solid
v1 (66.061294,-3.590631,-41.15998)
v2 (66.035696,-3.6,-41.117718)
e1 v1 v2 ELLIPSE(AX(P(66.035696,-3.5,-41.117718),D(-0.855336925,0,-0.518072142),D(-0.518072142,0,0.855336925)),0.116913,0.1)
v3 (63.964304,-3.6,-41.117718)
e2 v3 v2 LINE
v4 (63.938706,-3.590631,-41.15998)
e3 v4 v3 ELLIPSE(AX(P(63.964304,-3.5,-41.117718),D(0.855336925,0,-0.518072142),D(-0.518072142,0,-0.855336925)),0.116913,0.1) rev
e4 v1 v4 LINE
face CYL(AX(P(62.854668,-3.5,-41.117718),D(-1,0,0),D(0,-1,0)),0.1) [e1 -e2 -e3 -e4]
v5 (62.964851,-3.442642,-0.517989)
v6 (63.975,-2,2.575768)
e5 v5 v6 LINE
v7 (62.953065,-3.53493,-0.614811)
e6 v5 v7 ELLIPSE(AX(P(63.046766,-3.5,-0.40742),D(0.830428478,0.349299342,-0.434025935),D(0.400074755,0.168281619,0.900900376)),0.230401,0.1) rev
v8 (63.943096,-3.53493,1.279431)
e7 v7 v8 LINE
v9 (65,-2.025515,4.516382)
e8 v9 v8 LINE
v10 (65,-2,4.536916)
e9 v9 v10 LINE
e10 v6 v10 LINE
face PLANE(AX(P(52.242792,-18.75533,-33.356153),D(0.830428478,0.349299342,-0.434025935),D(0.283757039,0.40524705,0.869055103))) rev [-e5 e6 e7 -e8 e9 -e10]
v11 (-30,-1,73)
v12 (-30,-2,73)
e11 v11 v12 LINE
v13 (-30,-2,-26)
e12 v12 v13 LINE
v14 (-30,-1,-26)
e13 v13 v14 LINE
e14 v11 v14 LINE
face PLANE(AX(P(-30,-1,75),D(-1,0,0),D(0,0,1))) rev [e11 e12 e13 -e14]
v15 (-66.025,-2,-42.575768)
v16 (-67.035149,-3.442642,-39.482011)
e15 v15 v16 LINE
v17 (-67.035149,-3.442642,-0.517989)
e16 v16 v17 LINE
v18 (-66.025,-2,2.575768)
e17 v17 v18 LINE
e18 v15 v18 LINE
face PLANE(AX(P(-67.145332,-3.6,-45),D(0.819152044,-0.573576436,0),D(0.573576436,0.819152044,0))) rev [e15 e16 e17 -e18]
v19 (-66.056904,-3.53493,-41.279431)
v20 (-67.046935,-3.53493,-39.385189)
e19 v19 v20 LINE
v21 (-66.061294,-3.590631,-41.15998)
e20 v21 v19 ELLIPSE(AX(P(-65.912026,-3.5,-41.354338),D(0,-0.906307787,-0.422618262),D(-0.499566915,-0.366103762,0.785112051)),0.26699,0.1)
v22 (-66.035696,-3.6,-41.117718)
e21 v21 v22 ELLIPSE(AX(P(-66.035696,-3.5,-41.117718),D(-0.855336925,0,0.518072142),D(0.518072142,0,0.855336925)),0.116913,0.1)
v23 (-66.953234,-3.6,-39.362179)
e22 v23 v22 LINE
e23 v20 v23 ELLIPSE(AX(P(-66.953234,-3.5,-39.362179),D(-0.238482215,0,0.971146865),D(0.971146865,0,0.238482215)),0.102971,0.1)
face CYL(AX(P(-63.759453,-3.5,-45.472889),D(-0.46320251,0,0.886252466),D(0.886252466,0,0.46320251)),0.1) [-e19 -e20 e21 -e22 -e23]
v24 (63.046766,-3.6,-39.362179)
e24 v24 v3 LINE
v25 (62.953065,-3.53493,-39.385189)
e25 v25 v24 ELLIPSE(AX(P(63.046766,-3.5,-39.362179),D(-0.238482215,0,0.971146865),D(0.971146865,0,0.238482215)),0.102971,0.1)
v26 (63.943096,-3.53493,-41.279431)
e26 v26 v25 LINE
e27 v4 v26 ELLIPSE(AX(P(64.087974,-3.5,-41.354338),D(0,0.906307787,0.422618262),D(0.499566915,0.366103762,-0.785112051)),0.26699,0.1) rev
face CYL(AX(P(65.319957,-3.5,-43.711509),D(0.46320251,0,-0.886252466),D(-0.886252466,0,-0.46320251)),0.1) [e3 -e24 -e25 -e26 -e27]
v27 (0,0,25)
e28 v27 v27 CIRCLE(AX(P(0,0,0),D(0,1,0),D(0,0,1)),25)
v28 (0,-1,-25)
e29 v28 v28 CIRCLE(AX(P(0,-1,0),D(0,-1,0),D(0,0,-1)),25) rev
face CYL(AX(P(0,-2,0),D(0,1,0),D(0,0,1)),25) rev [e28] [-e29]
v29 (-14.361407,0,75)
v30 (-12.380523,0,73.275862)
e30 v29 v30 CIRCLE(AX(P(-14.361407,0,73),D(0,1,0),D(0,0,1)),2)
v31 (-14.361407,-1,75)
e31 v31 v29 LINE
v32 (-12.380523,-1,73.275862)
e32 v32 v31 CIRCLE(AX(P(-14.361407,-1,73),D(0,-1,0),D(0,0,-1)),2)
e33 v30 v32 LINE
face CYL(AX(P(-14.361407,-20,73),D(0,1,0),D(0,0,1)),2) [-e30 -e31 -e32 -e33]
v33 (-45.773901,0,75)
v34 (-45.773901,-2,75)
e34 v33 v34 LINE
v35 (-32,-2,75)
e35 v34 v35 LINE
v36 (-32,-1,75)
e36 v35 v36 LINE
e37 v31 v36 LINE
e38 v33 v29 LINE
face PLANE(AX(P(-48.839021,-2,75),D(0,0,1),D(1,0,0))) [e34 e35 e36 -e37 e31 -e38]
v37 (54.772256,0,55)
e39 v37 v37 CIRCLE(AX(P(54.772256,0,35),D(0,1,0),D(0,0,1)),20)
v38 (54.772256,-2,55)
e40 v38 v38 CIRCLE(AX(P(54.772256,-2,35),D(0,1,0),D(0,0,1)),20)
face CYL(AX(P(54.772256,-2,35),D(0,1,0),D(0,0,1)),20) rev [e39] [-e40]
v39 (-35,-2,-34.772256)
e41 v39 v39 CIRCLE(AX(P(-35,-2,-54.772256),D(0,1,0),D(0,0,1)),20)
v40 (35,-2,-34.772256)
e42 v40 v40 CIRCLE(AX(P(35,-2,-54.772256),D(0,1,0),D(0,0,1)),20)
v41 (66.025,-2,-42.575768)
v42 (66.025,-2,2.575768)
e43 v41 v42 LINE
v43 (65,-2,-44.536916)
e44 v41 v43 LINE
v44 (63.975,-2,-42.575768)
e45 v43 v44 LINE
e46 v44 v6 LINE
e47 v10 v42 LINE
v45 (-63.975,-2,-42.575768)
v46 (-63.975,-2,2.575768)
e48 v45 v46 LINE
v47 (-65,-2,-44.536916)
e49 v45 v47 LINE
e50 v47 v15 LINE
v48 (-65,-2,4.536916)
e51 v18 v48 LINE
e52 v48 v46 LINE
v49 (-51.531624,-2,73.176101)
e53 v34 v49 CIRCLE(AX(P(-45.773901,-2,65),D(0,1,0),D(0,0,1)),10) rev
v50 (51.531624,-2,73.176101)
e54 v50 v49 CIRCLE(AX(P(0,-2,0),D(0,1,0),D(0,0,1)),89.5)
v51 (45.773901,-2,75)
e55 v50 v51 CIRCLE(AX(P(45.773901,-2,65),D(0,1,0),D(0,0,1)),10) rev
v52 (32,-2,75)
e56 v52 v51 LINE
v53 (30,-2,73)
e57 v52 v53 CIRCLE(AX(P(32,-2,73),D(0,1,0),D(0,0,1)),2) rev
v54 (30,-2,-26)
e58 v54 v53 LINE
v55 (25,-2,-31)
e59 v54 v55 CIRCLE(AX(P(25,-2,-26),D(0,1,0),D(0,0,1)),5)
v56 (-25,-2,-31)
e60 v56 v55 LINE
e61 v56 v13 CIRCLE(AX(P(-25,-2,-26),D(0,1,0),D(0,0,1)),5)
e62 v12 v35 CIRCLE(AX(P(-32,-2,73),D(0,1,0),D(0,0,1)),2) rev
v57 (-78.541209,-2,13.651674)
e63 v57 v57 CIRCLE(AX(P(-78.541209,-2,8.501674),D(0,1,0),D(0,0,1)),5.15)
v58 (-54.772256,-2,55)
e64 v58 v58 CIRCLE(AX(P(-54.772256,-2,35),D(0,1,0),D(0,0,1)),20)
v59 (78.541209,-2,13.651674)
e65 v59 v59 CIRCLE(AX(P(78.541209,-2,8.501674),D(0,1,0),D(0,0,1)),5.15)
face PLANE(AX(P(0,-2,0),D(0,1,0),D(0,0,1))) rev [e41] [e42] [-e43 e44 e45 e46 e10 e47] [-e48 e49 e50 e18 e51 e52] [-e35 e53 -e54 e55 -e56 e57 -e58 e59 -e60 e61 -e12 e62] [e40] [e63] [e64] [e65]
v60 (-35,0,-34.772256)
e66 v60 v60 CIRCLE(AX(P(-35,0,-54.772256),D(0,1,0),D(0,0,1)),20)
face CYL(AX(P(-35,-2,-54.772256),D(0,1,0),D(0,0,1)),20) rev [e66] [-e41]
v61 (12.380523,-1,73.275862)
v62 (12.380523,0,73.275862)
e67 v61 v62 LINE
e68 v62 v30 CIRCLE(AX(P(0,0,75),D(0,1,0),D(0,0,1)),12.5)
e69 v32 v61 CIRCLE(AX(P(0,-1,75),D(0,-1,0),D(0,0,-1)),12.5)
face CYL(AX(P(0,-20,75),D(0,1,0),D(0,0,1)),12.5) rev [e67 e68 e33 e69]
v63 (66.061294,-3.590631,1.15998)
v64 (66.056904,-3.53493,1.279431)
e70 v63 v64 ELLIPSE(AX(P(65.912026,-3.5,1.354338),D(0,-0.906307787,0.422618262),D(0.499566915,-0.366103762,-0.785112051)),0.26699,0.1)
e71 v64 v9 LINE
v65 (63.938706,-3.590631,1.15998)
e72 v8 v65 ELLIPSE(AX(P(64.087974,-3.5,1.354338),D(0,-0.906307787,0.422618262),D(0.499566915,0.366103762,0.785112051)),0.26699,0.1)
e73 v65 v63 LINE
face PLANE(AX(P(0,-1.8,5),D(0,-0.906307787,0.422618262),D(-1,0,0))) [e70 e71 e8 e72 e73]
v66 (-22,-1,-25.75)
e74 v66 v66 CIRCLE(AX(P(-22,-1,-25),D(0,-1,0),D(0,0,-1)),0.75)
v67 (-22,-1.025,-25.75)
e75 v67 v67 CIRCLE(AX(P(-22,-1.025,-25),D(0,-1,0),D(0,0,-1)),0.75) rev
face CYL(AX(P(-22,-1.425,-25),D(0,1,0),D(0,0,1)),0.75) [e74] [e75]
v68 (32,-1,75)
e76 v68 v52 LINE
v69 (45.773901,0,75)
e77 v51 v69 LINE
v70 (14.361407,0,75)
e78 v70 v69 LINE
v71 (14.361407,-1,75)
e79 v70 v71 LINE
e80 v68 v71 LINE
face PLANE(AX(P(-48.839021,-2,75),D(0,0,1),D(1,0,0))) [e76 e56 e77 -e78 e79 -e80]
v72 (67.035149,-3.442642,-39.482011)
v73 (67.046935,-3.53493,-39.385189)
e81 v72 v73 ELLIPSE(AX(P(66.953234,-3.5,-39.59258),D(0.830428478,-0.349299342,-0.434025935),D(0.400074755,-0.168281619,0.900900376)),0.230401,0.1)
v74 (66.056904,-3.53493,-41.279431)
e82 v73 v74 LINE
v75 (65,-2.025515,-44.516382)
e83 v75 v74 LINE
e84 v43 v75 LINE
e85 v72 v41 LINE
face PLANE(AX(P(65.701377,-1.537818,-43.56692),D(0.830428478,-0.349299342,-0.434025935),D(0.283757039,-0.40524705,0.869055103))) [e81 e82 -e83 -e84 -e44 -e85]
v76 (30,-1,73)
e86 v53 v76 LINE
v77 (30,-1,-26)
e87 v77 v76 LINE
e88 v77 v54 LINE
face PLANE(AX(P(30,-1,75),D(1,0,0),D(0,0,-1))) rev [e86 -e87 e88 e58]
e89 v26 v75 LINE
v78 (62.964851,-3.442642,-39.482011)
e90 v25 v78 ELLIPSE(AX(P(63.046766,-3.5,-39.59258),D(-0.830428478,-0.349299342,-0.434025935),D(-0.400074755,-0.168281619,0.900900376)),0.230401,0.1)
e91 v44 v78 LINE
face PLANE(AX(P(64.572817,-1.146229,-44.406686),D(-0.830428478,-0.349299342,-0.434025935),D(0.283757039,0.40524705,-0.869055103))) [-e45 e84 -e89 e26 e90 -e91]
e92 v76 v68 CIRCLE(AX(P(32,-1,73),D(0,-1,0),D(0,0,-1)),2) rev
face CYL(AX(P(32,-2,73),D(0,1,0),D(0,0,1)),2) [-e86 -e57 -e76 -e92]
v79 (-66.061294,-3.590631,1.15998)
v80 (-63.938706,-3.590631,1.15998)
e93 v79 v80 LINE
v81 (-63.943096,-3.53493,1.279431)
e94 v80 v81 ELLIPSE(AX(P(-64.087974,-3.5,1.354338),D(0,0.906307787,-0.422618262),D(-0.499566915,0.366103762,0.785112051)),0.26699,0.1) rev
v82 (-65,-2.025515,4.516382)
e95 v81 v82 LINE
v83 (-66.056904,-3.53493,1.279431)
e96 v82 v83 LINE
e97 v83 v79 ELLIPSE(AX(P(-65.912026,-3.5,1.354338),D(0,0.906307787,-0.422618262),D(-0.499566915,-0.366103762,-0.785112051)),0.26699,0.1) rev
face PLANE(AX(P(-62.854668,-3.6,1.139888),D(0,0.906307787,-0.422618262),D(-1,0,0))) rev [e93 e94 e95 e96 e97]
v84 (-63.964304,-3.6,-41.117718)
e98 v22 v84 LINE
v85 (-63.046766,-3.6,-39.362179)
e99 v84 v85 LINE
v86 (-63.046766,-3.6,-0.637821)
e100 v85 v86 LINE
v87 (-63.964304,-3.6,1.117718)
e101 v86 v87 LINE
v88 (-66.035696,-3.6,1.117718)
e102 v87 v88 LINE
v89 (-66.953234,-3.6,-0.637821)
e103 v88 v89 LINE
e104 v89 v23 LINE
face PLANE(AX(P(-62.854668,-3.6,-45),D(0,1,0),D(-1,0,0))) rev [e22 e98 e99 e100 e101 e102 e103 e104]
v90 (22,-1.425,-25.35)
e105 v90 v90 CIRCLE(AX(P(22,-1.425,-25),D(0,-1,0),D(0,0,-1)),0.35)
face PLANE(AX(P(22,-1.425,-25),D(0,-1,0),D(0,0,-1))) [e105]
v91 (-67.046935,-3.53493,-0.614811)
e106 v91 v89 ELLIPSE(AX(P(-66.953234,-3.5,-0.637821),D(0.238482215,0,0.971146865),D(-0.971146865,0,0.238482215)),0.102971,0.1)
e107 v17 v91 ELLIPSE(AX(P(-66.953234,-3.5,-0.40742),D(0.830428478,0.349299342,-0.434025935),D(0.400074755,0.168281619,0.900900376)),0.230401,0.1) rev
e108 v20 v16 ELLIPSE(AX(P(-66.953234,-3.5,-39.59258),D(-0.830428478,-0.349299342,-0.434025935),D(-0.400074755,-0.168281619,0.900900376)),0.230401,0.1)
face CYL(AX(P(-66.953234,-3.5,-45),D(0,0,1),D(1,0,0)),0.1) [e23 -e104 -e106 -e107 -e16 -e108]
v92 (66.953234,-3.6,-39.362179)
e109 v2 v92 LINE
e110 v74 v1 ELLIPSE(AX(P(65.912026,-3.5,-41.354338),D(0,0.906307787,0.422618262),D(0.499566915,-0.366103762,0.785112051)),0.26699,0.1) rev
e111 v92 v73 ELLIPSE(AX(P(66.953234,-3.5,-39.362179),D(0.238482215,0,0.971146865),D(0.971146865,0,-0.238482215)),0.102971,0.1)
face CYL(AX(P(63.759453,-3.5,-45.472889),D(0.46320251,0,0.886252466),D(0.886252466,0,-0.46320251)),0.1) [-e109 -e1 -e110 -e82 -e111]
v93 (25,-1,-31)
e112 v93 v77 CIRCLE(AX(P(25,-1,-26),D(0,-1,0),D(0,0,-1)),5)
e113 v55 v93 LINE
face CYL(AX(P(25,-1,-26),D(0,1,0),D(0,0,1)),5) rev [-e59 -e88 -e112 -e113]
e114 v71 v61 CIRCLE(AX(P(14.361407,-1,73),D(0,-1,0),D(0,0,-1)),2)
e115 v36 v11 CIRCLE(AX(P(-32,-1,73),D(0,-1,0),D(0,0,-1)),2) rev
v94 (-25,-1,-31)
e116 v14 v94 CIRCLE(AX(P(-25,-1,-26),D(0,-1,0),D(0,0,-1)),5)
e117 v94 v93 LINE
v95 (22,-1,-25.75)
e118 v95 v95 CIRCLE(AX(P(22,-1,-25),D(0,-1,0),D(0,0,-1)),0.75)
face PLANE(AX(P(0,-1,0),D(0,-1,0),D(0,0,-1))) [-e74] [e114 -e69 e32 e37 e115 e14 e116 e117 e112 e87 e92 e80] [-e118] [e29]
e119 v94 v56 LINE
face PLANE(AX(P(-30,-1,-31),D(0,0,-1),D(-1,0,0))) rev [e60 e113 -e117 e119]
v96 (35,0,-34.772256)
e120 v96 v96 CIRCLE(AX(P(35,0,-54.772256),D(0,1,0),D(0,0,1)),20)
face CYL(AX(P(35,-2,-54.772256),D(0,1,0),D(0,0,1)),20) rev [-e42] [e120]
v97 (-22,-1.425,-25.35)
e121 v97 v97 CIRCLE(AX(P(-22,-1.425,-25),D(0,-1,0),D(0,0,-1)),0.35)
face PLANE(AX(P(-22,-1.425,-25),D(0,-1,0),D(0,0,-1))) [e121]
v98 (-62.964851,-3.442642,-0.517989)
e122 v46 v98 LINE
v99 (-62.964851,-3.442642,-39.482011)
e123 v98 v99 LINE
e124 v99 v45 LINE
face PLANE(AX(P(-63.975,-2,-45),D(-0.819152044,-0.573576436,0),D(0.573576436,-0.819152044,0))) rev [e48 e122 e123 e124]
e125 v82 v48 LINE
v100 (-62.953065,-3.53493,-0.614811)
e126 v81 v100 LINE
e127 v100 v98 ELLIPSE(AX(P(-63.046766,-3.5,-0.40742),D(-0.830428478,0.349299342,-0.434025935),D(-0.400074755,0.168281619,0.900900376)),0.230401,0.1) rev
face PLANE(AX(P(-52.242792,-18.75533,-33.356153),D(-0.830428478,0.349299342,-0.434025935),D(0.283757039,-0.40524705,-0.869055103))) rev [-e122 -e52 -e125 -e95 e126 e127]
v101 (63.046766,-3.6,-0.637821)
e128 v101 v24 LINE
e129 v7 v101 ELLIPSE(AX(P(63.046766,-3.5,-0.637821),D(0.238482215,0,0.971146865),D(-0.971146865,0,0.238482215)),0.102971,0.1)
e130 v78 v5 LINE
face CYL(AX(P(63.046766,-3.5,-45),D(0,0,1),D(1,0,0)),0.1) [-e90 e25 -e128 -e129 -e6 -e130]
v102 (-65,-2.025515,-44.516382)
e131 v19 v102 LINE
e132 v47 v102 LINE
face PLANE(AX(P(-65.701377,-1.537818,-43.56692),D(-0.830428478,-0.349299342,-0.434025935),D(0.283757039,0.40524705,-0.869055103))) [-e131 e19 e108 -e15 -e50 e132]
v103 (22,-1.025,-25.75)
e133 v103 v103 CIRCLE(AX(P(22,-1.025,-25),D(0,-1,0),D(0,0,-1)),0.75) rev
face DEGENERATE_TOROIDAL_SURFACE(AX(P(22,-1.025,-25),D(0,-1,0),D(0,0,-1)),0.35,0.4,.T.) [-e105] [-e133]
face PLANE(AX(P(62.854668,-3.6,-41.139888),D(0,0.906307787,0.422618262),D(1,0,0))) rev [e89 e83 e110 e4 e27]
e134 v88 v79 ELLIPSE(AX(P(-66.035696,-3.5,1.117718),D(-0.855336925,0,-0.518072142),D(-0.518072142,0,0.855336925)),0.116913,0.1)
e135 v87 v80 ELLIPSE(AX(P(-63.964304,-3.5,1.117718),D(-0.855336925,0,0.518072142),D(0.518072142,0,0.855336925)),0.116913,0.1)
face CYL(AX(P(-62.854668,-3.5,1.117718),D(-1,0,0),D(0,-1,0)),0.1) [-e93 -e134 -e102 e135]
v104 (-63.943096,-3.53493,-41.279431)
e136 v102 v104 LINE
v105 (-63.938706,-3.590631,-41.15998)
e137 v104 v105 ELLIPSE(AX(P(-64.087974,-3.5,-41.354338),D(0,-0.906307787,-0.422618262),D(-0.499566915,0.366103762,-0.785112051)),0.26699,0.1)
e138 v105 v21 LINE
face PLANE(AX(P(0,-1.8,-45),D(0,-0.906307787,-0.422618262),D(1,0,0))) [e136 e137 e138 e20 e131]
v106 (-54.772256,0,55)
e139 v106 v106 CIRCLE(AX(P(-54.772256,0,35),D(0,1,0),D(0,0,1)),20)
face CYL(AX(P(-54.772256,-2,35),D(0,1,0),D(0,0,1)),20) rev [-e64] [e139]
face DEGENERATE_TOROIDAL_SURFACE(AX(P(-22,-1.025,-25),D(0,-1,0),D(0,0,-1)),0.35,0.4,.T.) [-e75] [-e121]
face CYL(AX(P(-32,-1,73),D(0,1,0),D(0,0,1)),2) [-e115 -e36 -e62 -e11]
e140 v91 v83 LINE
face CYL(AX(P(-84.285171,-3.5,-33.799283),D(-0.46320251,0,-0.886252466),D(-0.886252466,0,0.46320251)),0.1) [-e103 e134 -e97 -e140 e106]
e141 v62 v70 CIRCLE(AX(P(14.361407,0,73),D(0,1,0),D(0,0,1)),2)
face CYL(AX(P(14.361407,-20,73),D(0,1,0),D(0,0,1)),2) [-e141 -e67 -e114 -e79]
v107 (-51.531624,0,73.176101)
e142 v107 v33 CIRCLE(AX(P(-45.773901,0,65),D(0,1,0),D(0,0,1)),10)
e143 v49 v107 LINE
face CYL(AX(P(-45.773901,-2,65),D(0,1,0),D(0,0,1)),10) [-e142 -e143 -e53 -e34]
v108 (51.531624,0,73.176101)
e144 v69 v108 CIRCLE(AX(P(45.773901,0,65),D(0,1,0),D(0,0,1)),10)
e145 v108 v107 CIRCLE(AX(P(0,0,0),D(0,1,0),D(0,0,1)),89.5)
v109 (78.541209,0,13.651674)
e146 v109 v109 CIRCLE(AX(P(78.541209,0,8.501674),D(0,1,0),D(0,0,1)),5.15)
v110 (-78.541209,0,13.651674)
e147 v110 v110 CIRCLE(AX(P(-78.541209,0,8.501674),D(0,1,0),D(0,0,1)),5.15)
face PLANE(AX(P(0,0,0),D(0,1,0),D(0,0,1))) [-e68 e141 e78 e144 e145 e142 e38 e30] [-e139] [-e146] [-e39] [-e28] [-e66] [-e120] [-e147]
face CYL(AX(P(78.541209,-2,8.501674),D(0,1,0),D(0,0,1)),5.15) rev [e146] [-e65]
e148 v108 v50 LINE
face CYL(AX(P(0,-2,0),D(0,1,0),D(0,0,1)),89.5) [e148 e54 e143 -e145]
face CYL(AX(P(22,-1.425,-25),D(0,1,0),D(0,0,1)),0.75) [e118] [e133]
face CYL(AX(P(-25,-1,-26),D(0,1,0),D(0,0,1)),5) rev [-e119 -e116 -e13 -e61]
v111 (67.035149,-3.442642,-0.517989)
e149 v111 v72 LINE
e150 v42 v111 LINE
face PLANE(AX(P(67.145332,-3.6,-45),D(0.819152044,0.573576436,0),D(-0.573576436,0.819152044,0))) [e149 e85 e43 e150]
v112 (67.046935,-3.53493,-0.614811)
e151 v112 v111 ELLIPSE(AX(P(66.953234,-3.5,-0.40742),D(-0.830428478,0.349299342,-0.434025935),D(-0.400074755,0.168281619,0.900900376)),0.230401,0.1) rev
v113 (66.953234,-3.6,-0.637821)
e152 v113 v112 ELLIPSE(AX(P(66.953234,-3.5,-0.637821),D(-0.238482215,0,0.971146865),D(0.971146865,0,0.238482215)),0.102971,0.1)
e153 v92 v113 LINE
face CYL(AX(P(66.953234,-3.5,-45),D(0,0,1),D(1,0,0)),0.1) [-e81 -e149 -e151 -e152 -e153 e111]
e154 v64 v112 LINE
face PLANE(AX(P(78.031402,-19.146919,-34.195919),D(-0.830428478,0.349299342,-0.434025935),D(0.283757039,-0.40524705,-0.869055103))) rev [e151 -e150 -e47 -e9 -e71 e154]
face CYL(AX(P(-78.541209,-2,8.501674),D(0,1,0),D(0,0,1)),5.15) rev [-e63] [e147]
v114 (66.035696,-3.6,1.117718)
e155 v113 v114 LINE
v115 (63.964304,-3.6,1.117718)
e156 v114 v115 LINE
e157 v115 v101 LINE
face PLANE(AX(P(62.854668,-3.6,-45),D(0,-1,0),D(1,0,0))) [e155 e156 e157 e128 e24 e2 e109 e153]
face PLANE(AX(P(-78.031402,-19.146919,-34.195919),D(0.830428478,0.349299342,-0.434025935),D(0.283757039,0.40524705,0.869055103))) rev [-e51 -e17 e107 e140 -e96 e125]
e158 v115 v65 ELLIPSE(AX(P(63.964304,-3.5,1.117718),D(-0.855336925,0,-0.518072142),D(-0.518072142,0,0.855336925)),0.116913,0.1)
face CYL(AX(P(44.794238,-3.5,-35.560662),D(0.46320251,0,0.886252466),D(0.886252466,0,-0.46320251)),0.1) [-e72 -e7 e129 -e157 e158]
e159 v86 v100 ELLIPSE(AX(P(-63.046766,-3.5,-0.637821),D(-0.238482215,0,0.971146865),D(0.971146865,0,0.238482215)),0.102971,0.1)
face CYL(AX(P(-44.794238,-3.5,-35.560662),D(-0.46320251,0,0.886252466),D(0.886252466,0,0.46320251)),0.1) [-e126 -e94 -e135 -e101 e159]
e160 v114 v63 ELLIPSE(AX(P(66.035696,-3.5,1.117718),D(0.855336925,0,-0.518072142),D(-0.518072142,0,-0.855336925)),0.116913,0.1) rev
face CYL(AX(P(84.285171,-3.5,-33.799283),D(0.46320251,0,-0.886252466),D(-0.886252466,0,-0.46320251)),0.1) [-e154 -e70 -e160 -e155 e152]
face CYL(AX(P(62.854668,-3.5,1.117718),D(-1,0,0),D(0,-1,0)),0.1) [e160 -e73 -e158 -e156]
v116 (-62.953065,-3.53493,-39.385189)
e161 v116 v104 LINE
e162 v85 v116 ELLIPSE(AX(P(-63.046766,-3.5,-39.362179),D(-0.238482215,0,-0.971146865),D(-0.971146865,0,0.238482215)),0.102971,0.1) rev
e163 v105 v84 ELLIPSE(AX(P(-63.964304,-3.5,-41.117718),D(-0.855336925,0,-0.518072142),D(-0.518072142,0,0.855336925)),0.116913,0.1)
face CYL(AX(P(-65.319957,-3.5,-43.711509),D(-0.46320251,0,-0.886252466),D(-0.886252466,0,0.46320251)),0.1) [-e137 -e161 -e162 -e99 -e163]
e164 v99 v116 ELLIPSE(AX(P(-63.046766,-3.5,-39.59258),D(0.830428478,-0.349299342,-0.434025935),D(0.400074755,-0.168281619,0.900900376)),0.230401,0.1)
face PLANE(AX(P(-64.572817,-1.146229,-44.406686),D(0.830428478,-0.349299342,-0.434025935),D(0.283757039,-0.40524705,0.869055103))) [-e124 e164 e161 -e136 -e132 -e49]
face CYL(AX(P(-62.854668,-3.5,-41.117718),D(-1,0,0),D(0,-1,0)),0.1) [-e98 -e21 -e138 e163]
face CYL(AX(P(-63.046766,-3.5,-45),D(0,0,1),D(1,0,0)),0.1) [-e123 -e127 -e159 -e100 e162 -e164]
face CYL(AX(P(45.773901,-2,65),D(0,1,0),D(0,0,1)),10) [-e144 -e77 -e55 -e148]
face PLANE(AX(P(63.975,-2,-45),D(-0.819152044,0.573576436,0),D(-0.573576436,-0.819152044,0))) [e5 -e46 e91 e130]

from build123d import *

# Parameters (mm, degrees)
BOSS_EXTRUDE1_DEPTH = 2
SKETCH9_R           = 5.15
CUT_EXTRUDE3_DEPTH  = 127.587914115
VISION_PATTERN_R    = 25
VISION_PATTERN_R_2  = 20
CUT_EXTRUDE4_DEPTH  = 127.587914115
FILLET1_R           = 10
BOSS_EXTRUDE4_DEPTH = 50
SKETCH12_W          = 60
SKETCH12_H          = 106
CUT_EXTRUDE5_DEPTH  = 1
SKETCH16_R          = 12.5
CUT_EXTRUDE9_DEPTH  = 20
SKETCH17_R          = 0.75
BOSS_EXTRUDE3_DEPTH = 0.425
CHAMFER1_SIZE       = 1.8
CHAMFER1_SIZE_2     = 3.860112457
CHAMFER2_SIZE       = 0.987120775
CHAMFER2_SIZE_2     = 1
FILLET3_R           = 0.1
FILLET2_R           = 0.4
FILLET4_R           = 5
FILLET5_R           = 2


with BuildPart() as part:
    # Sketch1 → Boss-Extrude1 (new body)
    with BuildSketch(Plane(origin=(0, 0, 0), x_dir=(1, 0, 0), z_dir=(0, 1, 0))):
        with BuildLine():
            Line((-48.839021284, -75), (48.839021284, -75))
            ThreePointArc((48.839021284, -75), (0, 89.5), (-48.839021284, -75))
        make_face()
    extrude(amount=-BOSS_EXTRUDE1_DEPTH)

    # Sketch9 → Cut-Extrude3 (cut, through all)
    with BuildSketch(Plane(origin=(0, 0, 0), x_dir=(1, 0, 0), z_dir=(0, 1, 0))):
        with Locations(Location((78.541209232, -8.501673503, 0), (0, 0, 270))):
            Circle(SKETCH9_R)
        with Locations(Location((-78.541209232, -8.501673503, 0), (0, 0, 270))):
            Circle(SKETCH9_R)
    extrude(amount=-CUT_EXTRUDE3_DEPTH, mode=Mode.SUBTRACT)

    # Vision Pattern → Cut-Extrude4 (cut, through all)
    with BuildSketch(Plane(origin=(0, 0, 0), x_dir=(1, 0, 0), z_dir=(0, 1, 0))):
        with Locations(Location((0, 0, 0), (0, 0, 270))):
            Circle(VISION_PATTERN_R)
        with Locations(Location((54.772255751, -35, 0), (0, 0, 270))):
            Circle(VISION_PATTERN_R_2)
        with Locations(Location((-54.772255751, -35, 0), (0, 0, 270))):
            Circle(VISION_PATTERN_R_2)
        with Locations(Location((35, 54.772255751, 0), (0, 0, 270))):
            Circle(VISION_PATTERN_R_2)
        with Locations(Location((-35, 54.772255751, 0), (0, 0, 270))):
            Circle(VISION_PATTERN_R_2)
    extrude(amount=-CUT_EXTRUDE4_DEPTH, mode=Mode.SUBTRACT)

    # Fillet1
    fillet1_edges = [part.edges().sort_by_distance(p)[0] for p in [
        (48.839021284, -1, 75),
        (-48.839021284, -1, 75),
    ]]
    fillet(fillet1_edges, radius=FILLET1_R)

    # Sketch18 → Boss-Extrude4 (add)
    with BuildSketch(Plane.XY.offset(5)):
        Polygon((62.854667939, -3.6), (67.145332061, -3.6), (66.025, -2), (63.975, -2), align=None)
    boss_extrude4 = extrude(amount=-BOSS_EXTRUDE4_DEPTH)

    # Mirror2: Boss-Extrude4 across plane
    add(boss_extrude4.mirror(Plane(origin=(0, 0, 0), x_dir=(0, 0, 1), z_dir=(1, 0, 0))))

    # Sketch12 → Cut-Extrude5 (cut)
    with BuildSketch(Plane.XZ.offset(2)):
        with Locations((0, 22)):
            Rectangle(SKETCH12_W, SKETCH12_H)
    extrude(amount=-CUT_EXTRUDE5_DEPTH, mode=Mode.SUBTRACT)

    # Sketch16 → Cut-Extrude9 (cut)
    with BuildSketch(Plane(origin=(0, 0, 0), x_dir=(1, 0, 0), z_dir=(0, 1, 0))):
        with Locations((0, -75)):
            Circle(SKETCH16_R)
    extrude(amount=-CUT_EXTRUDE9_DEPTH, mode=Mode.SUBTRACT)

    # Sketch17 → Boss-Extrude3 (add)
    with BuildSketch(Plane.XZ.offset(1)):
        with Locations(Location((-22, -25, 0), (0, 0, 270))):
            Circle(SKETCH17_R)
    boss_extrude3 = extrude(amount=BOSS_EXTRUDE3_DEPTH)

    # Mirror1: Boss-Extrude3 across plane
    add(boss_extrude3.mirror(Plane(origin=(0, 0, 0), x_dir=(0, 0, 1), z_dir=(1, 0, 0))))

    # Chamfer1
    # the kernel refuses this chamfer: 3.860112457, 1.8 mm, written as the material it takes off along each edge
    with BuildSketch(Plane(origin=(52.853211246, -3.6, -45), x_dir=(0, 0.9971975577536774, -0.07481330637060049), z_dir=(1, 0, 0))) as chamfer1_piece_1_section:
        Polygon((CHAMFER1_SIZE * 0.997197557754, CHAMFER1_SIZE * 0.0748133063706), (-CHAMFER1_SIZE_2 * 0.074813306369, CHAMFER1_SIZE_2 * 0.997197557732), (0, 0), align=None)
    chamfer1_piece_1 = extrude(amount=24.293577508, mode=Mode.PRIVATE)
    chamfer1_piece_1 = split(chamfer1_piece_1, bisect_by=Plane(origin=(65, -2, -43.665311996), z_dir=(0, -1, 0)), keep=Keep.TOP, mode=Mode.PRIVATE)
    add(chamfer1_piece_1, mode=Mode.SUBTRACT)
    with BuildSketch(Plane(origin=(52.853211246, -3.6, 5), x_dir=(0, 0.9971975577536774, 0.07481330637060049), z_dir=(1, 0, 0))) as chamfer1_piece_2_section:
        Polygon((CHAMFER1_SIZE * 0.997197557754, -CHAMFER1_SIZE * 0.0748133063706), (-CHAMFER1_SIZE_2 * 0.074813306369, -CHAMFER1_SIZE_2 * 0.997197557732), (0, 0), align=None)
    chamfer1_piece_2 = extrude(amount=24.293577508, mode=Mode.PRIVATE)
    chamfer1_piece_2 = split(chamfer1_piece_2, bisect_by=Plane(origin=(65, -2, 3.665311996), z_dir=(0, -1, 0)), keep=Keep.TOP, mode=Mode.PRIVATE)
    add(chamfer1_piece_2, mode=Mode.SUBTRACT)
    with BuildSketch(Plane(origin=(-52.853211246, -3.6, 5), x_dir=(0, 0.9971975577536774, 0.07481330637060049), z_dir=(-1, 0, 0))) as chamfer1_piece_3_section:
        Polygon((CHAMFER1_SIZE * 0.997197557754, CHAMFER1_SIZE * 0.0748133063706), (-CHAMFER1_SIZE_2 * 0.074813306369, CHAMFER1_SIZE_2 * 0.997197557732), (0, 0), align=None)
    chamfer1_piece_3 = extrude(amount=24.293577508, mode=Mode.PRIVATE)
    chamfer1_piece_3 = split(chamfer1_piece_3, bisect_by=Plane(origin=(-65, -2, 3.665311996), z_dir=(0, -1, 0)), keep=Keep.TOP, mode=Mode.PRIVATE)
    add(chamfer1_piece_3, mode=Mode.SUBTRACT)
    with BuildSketch(Plane(origin=(-52.853211246, -3.6, -45), x_dir=(0, 0.9971975577536774, -0.07481330637060049), z_dir=(-1, 0, 0))) as chamfer1_piece_4_section:
        Polygon((CHAMFER1_SIZE * 0.997197557754, -CHAMFER1_SIZE * 0.0748133063706), (-CHAMFER1_SIZE_2 * 0.074813306369, -CHAMFER1_SIZE_2 * 0.997197557732), (0, 0), align=None)
    chamfer1_piece_4 = extrude(amount=24.293577508, mode=Mode.PRIVATE)
    chamfer1_piece_4 = split(chamfer1_piece_4, bisect_by=Plane(origin=(-65, -2, -43.665311996), z_dir=(0, -1, 0)), keep=Keep.TOP, mode=Mode.PRIVATE)
    add(chamfer1_piece_4, mode=Mode.SUBTRACT)

    # Chamfer2
    # the kernel refuses this chamfer: 1, 0.987120775 mm, written as the material it takes off along each edge
    with BuildSketch(Plane(origin=(-65.301002381, -0.966024243, 6.788466782), x_dir=(0.4696180134880429, 0.7314458045546072, -0.49441476151810837), z_dir=(-0.2837570390591316, -0.4052470497313357, -0.8690551026652124))) as chamfer2_piece_1_section:
        Polygon((CHAMFER2_SIZE * 0.999392501434, CHAMFER2_SIZE * 0.0348515221858), (CHAMFER2_SIZE_2 * 0.489748534071, CHAMFER2_SIZE_2 * 0.871863735555), (0, 0), align=None)
    chamfer2_piece_1 = extrude(amount=9.051149208, mode=Mode.PRIVATE)
    chamfer2_piece_1 = split(chamfer2_piece_1, bisect_by=Plane(origin=(-66.526786639, -2, 1.318548556), z_dir=(0, -1, 0)), keep=Keep.TOP, mode=Mode.PRIVATE)
    add(chamfer2_piece_1, mode=Mode.SUBTRACT)
    with BuildSketch(Plane(origin=(-62.13067032, -4.633975757, -1.077480623), x_dir=(-0.46961801348803994, 0.73144580455461, -0.49441476151810687), z_dir=(-0.28375703905912847, 0.40524704973133613, 0.8690551026652132))) as chamfer2_piece_2_section:
        Polygon((CHAMFER2_SIZE * 0.999392501434, CHAMFER2_SIZE * 0.0348515221858), (CHAMFER2_SIZE_2 * 0.489748534071, CHAMFER2_SIZE_2 * 0.871863735555), (0, 0), align=None)
    chamfer2_piece_2 = extrude(amount=9.051149208, mode=Mode.PRIVATE)
    chamfer2_piece_2 = split(chamfer2_piece_2, bisect_by=Plane(origin=(-63.473213361, -2, 1.318548556), z_dir=(0, -1, 0)), keep=Keep.TOP, mode=Mode.PRIVATE)
    add(chamfer2_piece_2, mode=Mode.SUBTRACT)
    with BuildSketch(Plane(origin=(64.698997619, -0.966024243, 6.788466782), x_dir=(0.9583436918926346, -0.15061389857445218, -0.24267843284024973), z_dir=(-0.28375703905912847, -0.40524704973133613, -0.8690551026652132))) as chamfer2_piece_3_section:
        Polygon((CHAMFER2_SIZE_2 * 0.999423797129, -CHAMFER2_SIZE_2 * 0.0339422116651), (CHAMFER2_SIZE * 0.490541595675, -CHAMFER2_SIZE * 0.871417777782), (0, 0), align=None)
    chamfer2_piece_3 = extrude(amount=9.051149208, mode=Mode.PRIVATE)
    chamfer2_piece_3 = split(chamfer2_piece_3, bisect_by=Plane(origin=(63.473213361, -2, 1.318548556), z_dir=(0, -1, 0)), keep=Keep.TOP, mode=Mode.PRIVATE)
    add(chamfer2_piece_3, mode=Mode.SUBTRACT)
    with BuildSketch(Plane(origin=(67.86932968, -4.633975757, -1.077480623), x_dir=(-0.46961801348803955, 0.7314458045546093, -0.4944147615181082), z_dir=(-0.2837570390591316, 0.4052470497313357, 0.8690551026652124))) as chamfer2_piece_4_section:
        Polygon((CHAMFER2_SIZE * 0.999392501434, CHAMFER2_SIZE * 0.0348515221858), (CHAMFER2_SIZE_2 * 0.489748534071, CHAMFER2_SIZE_2 * 0.871863735555), (0, 0), align=None)
    chamfer2_piece_4 = extrude(amount=9.051149208, mode=Mode.PRIVATE)
    chamfer2_piece_4 = split(chamfer2_piece_4, bisect_by=Plane(origin=(66.526786639, -2, 1.318548556), z_dir=(0, -1, 0)), keep=Keep.TOP, mode=Mode.PRIVATE)
    add(chamfer2_piece_4, mode=Mode.SUBTRACT)
    with BuildSketch(Plane(origin=(-65.301002381, -0.966024243, -46.788466782), x_dir=(0.46961801348803894, 0.7314458045546097, 0.49441476151810826), z_dir=(-0.2837570390591316, -0.4052470497313357, 0.8690551026652124))) as chamfer2_piece_5_section:
        Polygon((CHAMFER2_SIZE * 0.999392501434, -CHAMFER2_SIZE * 0.0348515221858), (CHAMFER2_SIZE_2 * 0.489748534071, -CHAMFER2_SIZE_2 * 0.871863735555), (0, 0), align=None)
    chamfer2_piece_5 = extrude(amount=9.051149208, mode=Mode.PRIVATE)
    chamfer2_piece_5 = split(chamfer2_piece_5, bisect_by=Plane(origin=(-66.526786639, -2, -41.318548556), z_dir=(0, -1, 0)), keep=Keep.TOP, mode=Mode.PRIVATE)
    add(chamfer2_piece_5, mode=Mode.SUBTRACT)
    with BuildSketch(Plane(origin=(-62.13067032, -4.633975757, -38.922519377), x_dir=(-0.46961801348803905, 0.7314458045546104, 0.49441476151810687), z_dir=(-0.28375703905912847, 0.40524704973133613, -0.8690551026652132))) as chamfer2_piece_6_section:
        Polygon((CHAMFER2_SIZE * 0.999392501434, -CHAMFER2_SIZE * 0.0348515221858), (CHAMFER2_SIZE_2 * 0.489748534071, -CHAMFER2_SIZE_2 * 0.871863735555), (0, 0), align=None)
    chamfer2_piece_6 = extrude(amount=9.051149208, mode=Mode.PRIVATE)
    chamfer2_piece_6 = split(chamfer2_piece_6, bisect_by=Plane(origin=(-63.473213361, -2, -41.318548556), z_dir=(0, -1, 0)), keep=Keep.TOP, mode=Mode.PRIVATE)
    add(chamfer2_piece_6, mode=Mode.SUBTRACT)
    with BuildSketch(Plane(origin=(64.698997619, -0.966024243, -46.788466782), x_dir=(0.9583436918926347, -0.150613898574452, 0.24267843284024984), z_dir=(-0.28375703905912847, -0.40524704973133613, 0.8690551026652132))) as chamfer2_piece_7_section:
        Polygon((CHAMFER2_SIZE_2 * 0.999423797129, CHAMFER2_SIZE_2 * 0.0339422116651), (CHAMFER2_SIZE * 0.490541595675, CHAMFER2_SIZE * 0.871417777782), (0, 0), align=None)
    chamfer2_piece_7 = extrude(amount=9.051149208, mode=Mode.PRIVATE)
    chamfer2_piece_7 = split(chamfer2_piece_7, bisect_by=Plane(origin=(63.473213361, -2, -41.318548556), z_dir=(0, -1, 0)), keep=Keep.TOP, mode=Mode.PRIVATE)
    add(chamfer2_piece_7, mode=Mode.SUBTRACT)
    with BuildSketch(Plane(origin=(67.86932968, -4.633975757, -38.922519377), x_dir=(-0.46961801348803994, 0.731445804554609, 0.49441476151810815), z_dir=(-0.2837570390591316, 0.4052470497313357, -0.8690551026652124))) as chamfer2_piece_8_section:
        Polygon((CHAMFER2_SIZE * 0.999392501434, -CHAMFER2_SIZE * 0.0348515221858), (CHAMFER2_SIZE_2 * 0.489748534071, -CHAMFER2_SIZE_2 * 0.871863735555), (0, 0), align=None)
    chamfer2_piece_8 = extrude(amount=9.051149208, mode=Mode.PRIVATE)
    chamfer2_piece_8 = split(chamfer2_piece_8, bisect_by=Plane(origin=(66.526786639, -2, -41.318548556), z_dir=(0, -1, 0)), keep=Keep.TOP, mode=Mode.PRIVATE)
    add(chamfer2_piece_8, mode=Mode.SUBTRACT)

    # Fillet3
    fillet3_edges = [part.edges().sort_by_distance(p)[0] for p in [
        (-67.145332061, -3.6, -20),
        (-65, -3.6, -41.139887543),
        (-62.854667939, -3.6, -20),
        (-65, -3.6, 1.139887543),
        (-63.376100806, -3.6, 0.142222043),
        (-66.623899194, -3.6, 0.142222043),
        (-63.376100806, -3.6, -40.142222043),
        (-66.623899194, -3.6, -40.142222043),
        (62.854667939, -3.6, -20),
        (65, -3.6, -41.139887543),
        (67.145332061, -3.6, -20),
        (65, -3.6, 1.139887543),
        (66.623899194, -3.6, 0.142222043),
        (63.376100806, -3.6, 0.142222043),
        (66.623899194, -3.6, -40.142222043),
        (63.376100806, -3.6, -40.142222043),
    ]]
    fillet(fillet3_edges, radius=FILLET3_R)

    # Fillet2
    fillet2_edges = [part.edges().sort_by_distance(p)[0] for p in [
        (-22, -1.425, -24.25),
        (22, -1.425, -24.25),
    ]]
    fillet(fillet2_edges, radius=FILLET2_R)

    # Fillet4
    fillet4_edges = [part.edges().sort_by_distance(p)[0] for p in [
        (-30, -1.5, -31),
        (30, -1.5, -31),
    ]]
    fillet(fillet4_edges, radius=FILLET4_R)

    # Fillet5
    fillet5_edges = [part.edges().sort_by_distance(p)[0] for p in [
        (-12.5, -0.5, 75),
        (-30, -1.5, 75),
        (30, -1.5, 75),
        (12.5, -0.5, 75),
    ]]
    fillet(fillet5_edges, radius=FILLET5_R)


solid = part.part
